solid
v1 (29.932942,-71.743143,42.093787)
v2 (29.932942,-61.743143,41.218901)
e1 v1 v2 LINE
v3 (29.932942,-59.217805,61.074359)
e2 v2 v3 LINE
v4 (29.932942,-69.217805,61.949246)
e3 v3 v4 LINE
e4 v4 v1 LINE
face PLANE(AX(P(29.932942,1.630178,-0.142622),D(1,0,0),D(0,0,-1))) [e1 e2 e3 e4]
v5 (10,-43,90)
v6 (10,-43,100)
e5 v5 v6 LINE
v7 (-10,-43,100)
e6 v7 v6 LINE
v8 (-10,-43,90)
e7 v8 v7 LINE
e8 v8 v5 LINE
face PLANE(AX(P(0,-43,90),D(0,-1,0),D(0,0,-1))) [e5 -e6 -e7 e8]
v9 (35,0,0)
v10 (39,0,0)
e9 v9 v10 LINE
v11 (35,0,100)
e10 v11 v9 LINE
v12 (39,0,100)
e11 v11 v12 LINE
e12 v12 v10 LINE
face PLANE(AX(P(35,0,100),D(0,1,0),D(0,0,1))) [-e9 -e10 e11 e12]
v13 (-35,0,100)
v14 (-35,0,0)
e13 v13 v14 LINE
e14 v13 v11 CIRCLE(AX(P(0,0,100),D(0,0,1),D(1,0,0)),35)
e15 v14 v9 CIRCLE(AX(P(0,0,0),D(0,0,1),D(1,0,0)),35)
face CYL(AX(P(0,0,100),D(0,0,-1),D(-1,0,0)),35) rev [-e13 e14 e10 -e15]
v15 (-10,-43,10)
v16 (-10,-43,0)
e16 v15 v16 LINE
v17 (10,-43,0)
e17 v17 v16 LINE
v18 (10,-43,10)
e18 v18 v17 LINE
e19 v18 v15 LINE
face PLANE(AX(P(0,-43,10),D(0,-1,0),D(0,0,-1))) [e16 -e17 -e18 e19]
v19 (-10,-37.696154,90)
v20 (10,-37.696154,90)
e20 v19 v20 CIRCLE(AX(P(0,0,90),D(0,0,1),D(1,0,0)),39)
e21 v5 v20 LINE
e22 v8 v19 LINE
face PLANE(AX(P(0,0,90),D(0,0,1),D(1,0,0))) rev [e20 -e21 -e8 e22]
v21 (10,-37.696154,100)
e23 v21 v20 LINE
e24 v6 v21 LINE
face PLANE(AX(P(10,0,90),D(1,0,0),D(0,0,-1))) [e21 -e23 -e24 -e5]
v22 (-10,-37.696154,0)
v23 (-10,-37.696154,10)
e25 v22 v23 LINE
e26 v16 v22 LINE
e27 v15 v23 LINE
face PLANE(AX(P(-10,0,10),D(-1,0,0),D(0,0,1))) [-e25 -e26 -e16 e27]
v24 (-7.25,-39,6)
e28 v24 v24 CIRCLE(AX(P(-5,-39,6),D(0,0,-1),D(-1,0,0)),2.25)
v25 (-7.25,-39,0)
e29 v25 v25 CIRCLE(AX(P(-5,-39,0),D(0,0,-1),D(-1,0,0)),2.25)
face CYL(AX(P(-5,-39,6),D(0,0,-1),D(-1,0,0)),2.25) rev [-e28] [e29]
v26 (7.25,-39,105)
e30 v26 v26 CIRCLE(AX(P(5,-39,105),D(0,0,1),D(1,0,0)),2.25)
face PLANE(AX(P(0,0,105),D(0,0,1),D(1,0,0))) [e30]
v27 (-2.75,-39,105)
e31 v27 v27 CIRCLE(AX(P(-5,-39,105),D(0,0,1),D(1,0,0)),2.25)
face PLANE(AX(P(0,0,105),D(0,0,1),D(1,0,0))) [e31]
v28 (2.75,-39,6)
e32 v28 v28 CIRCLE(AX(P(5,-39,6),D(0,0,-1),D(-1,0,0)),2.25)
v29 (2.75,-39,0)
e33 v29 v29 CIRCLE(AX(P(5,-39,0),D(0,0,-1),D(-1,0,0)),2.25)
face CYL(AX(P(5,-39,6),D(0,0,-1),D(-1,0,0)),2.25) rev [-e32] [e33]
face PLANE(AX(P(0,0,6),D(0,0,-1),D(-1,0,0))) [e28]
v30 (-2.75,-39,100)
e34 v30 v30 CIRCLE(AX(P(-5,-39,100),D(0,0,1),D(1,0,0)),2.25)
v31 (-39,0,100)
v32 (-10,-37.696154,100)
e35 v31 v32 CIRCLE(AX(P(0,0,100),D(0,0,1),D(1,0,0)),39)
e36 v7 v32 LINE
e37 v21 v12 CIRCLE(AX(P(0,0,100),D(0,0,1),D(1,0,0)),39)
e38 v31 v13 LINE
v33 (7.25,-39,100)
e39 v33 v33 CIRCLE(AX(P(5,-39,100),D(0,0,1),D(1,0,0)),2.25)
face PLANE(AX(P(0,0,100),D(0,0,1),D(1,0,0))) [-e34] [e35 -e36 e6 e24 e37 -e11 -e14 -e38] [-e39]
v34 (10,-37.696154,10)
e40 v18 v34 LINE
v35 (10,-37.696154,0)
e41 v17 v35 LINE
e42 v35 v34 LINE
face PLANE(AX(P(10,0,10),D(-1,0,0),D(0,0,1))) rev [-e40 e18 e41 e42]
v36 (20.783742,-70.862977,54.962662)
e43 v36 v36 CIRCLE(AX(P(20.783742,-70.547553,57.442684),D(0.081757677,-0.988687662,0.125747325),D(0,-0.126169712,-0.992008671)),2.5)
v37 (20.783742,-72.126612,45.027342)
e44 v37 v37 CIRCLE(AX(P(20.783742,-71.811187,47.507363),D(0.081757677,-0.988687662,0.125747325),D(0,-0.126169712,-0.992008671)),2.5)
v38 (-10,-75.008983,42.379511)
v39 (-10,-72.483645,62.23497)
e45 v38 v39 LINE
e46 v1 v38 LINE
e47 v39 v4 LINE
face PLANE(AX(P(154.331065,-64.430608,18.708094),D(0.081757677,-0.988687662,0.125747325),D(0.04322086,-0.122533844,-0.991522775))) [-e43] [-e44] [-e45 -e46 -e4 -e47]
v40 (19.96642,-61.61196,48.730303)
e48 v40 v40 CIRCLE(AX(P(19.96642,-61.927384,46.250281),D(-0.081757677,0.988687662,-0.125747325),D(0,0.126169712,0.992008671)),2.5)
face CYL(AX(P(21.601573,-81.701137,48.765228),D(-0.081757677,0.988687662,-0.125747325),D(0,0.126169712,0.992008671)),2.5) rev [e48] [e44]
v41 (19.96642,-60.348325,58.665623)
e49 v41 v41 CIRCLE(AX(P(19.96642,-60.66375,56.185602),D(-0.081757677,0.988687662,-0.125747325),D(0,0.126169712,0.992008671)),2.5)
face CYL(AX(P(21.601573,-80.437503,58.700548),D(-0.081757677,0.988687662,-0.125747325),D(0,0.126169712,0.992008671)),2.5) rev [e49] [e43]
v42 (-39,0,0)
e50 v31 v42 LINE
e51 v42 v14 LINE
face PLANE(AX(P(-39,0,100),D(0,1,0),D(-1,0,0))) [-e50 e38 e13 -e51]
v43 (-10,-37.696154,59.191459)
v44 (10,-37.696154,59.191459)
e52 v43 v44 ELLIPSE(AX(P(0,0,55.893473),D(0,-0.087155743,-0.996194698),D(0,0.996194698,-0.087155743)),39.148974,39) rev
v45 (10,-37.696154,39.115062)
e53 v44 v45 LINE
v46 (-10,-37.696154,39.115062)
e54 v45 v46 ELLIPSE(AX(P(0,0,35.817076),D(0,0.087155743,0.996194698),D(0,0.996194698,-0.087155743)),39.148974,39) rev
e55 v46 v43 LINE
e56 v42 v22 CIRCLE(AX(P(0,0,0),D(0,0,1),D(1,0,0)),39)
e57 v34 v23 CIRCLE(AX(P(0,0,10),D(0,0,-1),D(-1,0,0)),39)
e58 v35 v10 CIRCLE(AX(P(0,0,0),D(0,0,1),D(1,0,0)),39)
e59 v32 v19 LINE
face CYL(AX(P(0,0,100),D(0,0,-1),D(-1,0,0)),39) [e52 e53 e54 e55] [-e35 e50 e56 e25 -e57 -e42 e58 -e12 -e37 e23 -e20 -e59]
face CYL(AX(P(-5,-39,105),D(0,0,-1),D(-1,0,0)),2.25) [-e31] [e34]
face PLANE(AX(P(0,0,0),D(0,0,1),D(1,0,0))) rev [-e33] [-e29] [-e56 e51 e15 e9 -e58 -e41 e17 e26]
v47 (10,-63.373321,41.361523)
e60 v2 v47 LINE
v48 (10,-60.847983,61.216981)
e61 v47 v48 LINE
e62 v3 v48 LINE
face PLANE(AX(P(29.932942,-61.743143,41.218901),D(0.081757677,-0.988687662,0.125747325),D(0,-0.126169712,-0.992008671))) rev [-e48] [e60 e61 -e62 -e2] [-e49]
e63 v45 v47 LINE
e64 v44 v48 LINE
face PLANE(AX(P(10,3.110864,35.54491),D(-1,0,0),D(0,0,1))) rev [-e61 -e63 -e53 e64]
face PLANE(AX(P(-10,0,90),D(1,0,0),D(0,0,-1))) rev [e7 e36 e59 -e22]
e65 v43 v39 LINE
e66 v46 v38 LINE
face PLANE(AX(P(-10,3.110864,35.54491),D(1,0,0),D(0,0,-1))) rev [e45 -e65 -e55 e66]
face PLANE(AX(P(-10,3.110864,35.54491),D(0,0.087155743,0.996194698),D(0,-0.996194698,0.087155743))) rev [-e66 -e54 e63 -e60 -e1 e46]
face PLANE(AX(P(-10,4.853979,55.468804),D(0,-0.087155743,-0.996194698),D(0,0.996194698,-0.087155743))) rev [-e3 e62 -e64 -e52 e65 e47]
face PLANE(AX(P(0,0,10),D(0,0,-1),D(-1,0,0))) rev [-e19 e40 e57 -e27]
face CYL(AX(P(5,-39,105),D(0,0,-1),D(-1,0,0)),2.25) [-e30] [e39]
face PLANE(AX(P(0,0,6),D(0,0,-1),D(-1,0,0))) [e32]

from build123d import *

# Parameters (mm, degrees)
EXTRUDE_THIN1_DEPTH       = 100
BOSS_EXTRUDE1_START       = -10
BOSS_EXTRUDE1_DEPTH       = 10
SKETCH3_R                 = 2.25
BOSS_EXTRUDE2_DEPTH       = 5
BOSS_EXTRUDE3_DEPTH       = 10
SKETCH5_R                 = 2.25
CUT_EXTRUDE1_DEPTH        = 6
BOSS_EXTRUDE4_REACH       = 121.416
BOSS_EXTRUDE4_END_RADIUS  = 39
SKETCH10_W                = 20
SKETCH10_H                = 20
BOSS_EXTRUDE5_START       = -26.86522245
BOSS_EXTRUDE5_OUTLINE_W   = 20
BOSS_EXTRUDE5_OUTLINE_H   = 20
BOSS_EXTRUDE5_DEPTH       = 26.86522245
BOSS_EXTRUDE5_START_2     = 78.671989238
BOSS_EXTRUDE5_2_OUTLINE_W = 23
BOSS_EXTRUDE5_2_OUTLINE_H = 23
BOSS_EXTRUDE5_2_DEPTH     = 3.328010762
BOSS_EXTRUDE6_DEPTH       = 20
SKETCH12_R                = 2.5
CUT_EXTRUDE2_DEPTH        = 20


with BuildPart() as part:
    # Sketch1 → Extrude-Thin1 (new body)
    with BuildSketch(Plane.XY):
        with BuildLine():
            ThreePointArc((-35, 0), (0, -35), (35, 0))
            Line((35, 0), (39, 0))
            ThreePointArc((39, 0), (0, -39), (-39, 0))
            Line((-39, 0), (-35, 0))
        make_face()
    extrude(amount=EXTRUDE_THIN1_DEPTH)

    # Sketch2 → Boss-Extrude1 (add)
    with BuildSketch(Plane.XY.offset(100).offset(BOSS_EXTRUDE1_START)):
        with BuildLine():
            Line((0, -39), (0, -35))
            Line((0, -35), (-10, -35))
            Line((-10, -35), (-10, -37.69615365))
            ThreePointArc((-10, -37.69615365), (-5.042321274, -38.672664715), (0, -39))
        make_face()
        with BuildLine():
            Line((10, -35), (0, -35))
            Line((0, -35), (0, -39))
            ThreePointArc((0, -39), (5.042321274, -38.672664715), (10, -37.69615365))
            Line((10, -37.69615365), (10, -35))
        make_face()
        with BuildLine():
            ThreePointArc((10, -37.69615365), (5.042321274, -38.672664715), (0, -39))
            ThreePointArc((0, -39), (-5.042321274, -38.672664715), (-10, -37.69615365))
            Line((-10, -37.69615365), (-10, -43))
            Line((-10, -43), (10, -43))
            Line((10, -43), (10, -37.69615365))
        make_face()
    extrude(amount=BOSS_EXTRUDE1_DEPTH)

    # Sketch3 → Boss-Extrude2 (add)
    with BuildSketch(Plane.XY.offset(100)):
        with Locations((-5, -39)):
            Circle(SKETCH3_R)
        with Locations((5, -39)):
            Circle(SKETCH3_R)
    extrude(amount=BOSS_EXTRUDE2_DEPTH)

    # Sketch4 → Boss-Extrude3 (add)
    with BuildSketch(Plane(origin=(0, 0, 0), x_dir=(-1, 0, 0), z_dir=(0, 0, -1))):
        with BuildLine():
            Line((0, -39), (0, -35))
            Line((0, -35), (-10, -35))
            Line((-10, -35), (-10, -37.69615365))
            ThreePointArc((-10, -37.69615365), (-5.042321274, -38.672664715), (0, -39))
        make_face()
        with BuildLine():
            ThreePointArc((10, -37.69615365), (5.042321274, -38.672664715), (0, -39))
            ThreePointArc((0, -39), (-5.042321274, -38.672664715), (-10, -37.69615365))
            Line((-10, -37.69615365), (-10, -43))
            Line((-10, -43), (10, -43))
            Line((10, -43), (10, -37.69615365))
        make_face()
        with BuildLine():
            Line((10, -35), (0, -35))
            Line((0, -35), (0, -39))
            ThreePointArc((0, -39), (5.042321274, -38.672664715), (10, -37.69615365))
            Line((10, -37.69615365), (10, -35))
        make_face()
    extrude(amount=-BOSS_EXTRUDE3_DEPTH)

    # Sketch5 → Cut-Extrude1 (cut)
    with BuildSketch(Plane(origin=(0, 0, 0), x_dir=(-1, 0, 0), z_dir=(0, 0, -1))):
        with Locations(Location((-5, -39, 0), (0, 0, 180))):
            Circle(SKETCH5_R)
        with Locations(Location((5, -39, 0), (0, 0, 180))):
            Circle(SKETCH5_R)
    extrude(amount=-CUT_EXTRUDE1_DEPTH, mode=Mode.SUBTRACT)

    # Boss-Extrude4: up to this cylinder (the profile starts outside it)
    boss_extrude4_end = Plane(origin=(0, 0, 50), z_dir=(0, 0, -1)) * Cylinder(BOSS_EXTRUDE4_END_RADIUS, 321.832, mode=Mode.PRIVATE)
    # Sketch10 → Boss-Extrude4 (add, up to the surface)
    with BuildSketch(Plane(origin=(0, -51.355775573, 4.493048169), x_dir=(1, 0, 0), z_dir=(0, 0.9961946980917462, -0.08715574274765152)), mode=Mode.PRIVATE) as boss_extrude4_sk1:
        with Locations((0, -45.680780994)):
            Rectangle(SKETCH10_W, SKETCH10_H)
    boss_extrude4_tool1 = extrude(boss_extrude4_sk1.sketch, amount=BOSS_EXTRUDE4_REACH, mode=Mode.PRIVATE) - boss_extrude4_end
    add(boss_extrude4_tool1.solids().sort_by_distance((0, -47.374433, 50))[0])

    # Boss-Extrude5: read off the stored shape, not the designer's step
    # Boss-Extrude5 outline → Boss-Extrude5 (add)
    with BuildSketch(Plane(origin=(0, -51.355775573, 4.493048169), x_dir=(1, 0, 0), z_dir=(0, 0.9961946980917462, -0.08715574274765152)).offset(BOSS_EXTRUDE5_START)):
        with Locations((0, -45.680780994)):
            Rectangle(BOSS_EXTRUDE5_OUTLINE_W, BOSS_EXTRUDE5_OUTLINE_H)
    extrude(amount=BOSS_EXTRUDE5_DEPTH)

    # Boss-Extrude5 2 outline → Boss-Extrude5 2 (cut)
    with BuildSketch(Plane(origin=(0, 0, 0), x_dir=(0.9966522374056315, 0.0811043240761468, -0.010315342480997098), z_dir=(0.08175767654690848, -0.9886876617314986, 0.12574732548071493)).offset(BOSS_EXTRUDE5_START_2)):
        with Locations((-6.5, 42.5)):
            Rectangle(BOSS_EXTRUDE5_2_OUTLINE_W, BOSS_EXTRUDE5_2_OUTLINE_H)
    extrude(amount=BOSS_EXTRUDE5_2_DEPTH, mode=Mode.SUBTRACT)

    # Sketch11 → Boss-Extrude6 (add, along a direction that is not the sketch's normal)
    with BuildSketch(Plane(origin=(10, 0, 0), x_dir=(0, 0, -1), z_dir=(1, 0, 0))):
        Polygon((-42.236409552, -73.373320758), (-41.361522917, -63.373320758), (-61.216981199, -60.847982502), (-62.091867834, -70.847982502), align=None)
    extrude(amount=BOSS_EXTRUDE6_DEPTH, dir=(0.9966471031139101, 0.08150889038642521, -0.007131103885419538))

    # Sketch12 → Cut-Extrude2 (cut)
    with BuildSketch(Plane(origin=(5.614716446, -67.898222027, 8.635709896), x_dir=(0.9966522374056316, 0.0811043240761468, -0.010315342480997105), z_dir=(-0.08175767654690848, 0.9886876617314987, -0.12574732548071463))):
        with Locations(Location((14.399910724, -38.067319735, 0), (0, 0, 270))):
            Circle(SKETCH12_R)
        with Locations(Location((14.399910724, -48.082676206, 0), (0, 0, 270))):
            Circle(SKETCH12_R)
    extrude(amount=-CUT_EXTRUDE2_DEPTH, mode=Mode.SUBTRACT)


solid = part.part
